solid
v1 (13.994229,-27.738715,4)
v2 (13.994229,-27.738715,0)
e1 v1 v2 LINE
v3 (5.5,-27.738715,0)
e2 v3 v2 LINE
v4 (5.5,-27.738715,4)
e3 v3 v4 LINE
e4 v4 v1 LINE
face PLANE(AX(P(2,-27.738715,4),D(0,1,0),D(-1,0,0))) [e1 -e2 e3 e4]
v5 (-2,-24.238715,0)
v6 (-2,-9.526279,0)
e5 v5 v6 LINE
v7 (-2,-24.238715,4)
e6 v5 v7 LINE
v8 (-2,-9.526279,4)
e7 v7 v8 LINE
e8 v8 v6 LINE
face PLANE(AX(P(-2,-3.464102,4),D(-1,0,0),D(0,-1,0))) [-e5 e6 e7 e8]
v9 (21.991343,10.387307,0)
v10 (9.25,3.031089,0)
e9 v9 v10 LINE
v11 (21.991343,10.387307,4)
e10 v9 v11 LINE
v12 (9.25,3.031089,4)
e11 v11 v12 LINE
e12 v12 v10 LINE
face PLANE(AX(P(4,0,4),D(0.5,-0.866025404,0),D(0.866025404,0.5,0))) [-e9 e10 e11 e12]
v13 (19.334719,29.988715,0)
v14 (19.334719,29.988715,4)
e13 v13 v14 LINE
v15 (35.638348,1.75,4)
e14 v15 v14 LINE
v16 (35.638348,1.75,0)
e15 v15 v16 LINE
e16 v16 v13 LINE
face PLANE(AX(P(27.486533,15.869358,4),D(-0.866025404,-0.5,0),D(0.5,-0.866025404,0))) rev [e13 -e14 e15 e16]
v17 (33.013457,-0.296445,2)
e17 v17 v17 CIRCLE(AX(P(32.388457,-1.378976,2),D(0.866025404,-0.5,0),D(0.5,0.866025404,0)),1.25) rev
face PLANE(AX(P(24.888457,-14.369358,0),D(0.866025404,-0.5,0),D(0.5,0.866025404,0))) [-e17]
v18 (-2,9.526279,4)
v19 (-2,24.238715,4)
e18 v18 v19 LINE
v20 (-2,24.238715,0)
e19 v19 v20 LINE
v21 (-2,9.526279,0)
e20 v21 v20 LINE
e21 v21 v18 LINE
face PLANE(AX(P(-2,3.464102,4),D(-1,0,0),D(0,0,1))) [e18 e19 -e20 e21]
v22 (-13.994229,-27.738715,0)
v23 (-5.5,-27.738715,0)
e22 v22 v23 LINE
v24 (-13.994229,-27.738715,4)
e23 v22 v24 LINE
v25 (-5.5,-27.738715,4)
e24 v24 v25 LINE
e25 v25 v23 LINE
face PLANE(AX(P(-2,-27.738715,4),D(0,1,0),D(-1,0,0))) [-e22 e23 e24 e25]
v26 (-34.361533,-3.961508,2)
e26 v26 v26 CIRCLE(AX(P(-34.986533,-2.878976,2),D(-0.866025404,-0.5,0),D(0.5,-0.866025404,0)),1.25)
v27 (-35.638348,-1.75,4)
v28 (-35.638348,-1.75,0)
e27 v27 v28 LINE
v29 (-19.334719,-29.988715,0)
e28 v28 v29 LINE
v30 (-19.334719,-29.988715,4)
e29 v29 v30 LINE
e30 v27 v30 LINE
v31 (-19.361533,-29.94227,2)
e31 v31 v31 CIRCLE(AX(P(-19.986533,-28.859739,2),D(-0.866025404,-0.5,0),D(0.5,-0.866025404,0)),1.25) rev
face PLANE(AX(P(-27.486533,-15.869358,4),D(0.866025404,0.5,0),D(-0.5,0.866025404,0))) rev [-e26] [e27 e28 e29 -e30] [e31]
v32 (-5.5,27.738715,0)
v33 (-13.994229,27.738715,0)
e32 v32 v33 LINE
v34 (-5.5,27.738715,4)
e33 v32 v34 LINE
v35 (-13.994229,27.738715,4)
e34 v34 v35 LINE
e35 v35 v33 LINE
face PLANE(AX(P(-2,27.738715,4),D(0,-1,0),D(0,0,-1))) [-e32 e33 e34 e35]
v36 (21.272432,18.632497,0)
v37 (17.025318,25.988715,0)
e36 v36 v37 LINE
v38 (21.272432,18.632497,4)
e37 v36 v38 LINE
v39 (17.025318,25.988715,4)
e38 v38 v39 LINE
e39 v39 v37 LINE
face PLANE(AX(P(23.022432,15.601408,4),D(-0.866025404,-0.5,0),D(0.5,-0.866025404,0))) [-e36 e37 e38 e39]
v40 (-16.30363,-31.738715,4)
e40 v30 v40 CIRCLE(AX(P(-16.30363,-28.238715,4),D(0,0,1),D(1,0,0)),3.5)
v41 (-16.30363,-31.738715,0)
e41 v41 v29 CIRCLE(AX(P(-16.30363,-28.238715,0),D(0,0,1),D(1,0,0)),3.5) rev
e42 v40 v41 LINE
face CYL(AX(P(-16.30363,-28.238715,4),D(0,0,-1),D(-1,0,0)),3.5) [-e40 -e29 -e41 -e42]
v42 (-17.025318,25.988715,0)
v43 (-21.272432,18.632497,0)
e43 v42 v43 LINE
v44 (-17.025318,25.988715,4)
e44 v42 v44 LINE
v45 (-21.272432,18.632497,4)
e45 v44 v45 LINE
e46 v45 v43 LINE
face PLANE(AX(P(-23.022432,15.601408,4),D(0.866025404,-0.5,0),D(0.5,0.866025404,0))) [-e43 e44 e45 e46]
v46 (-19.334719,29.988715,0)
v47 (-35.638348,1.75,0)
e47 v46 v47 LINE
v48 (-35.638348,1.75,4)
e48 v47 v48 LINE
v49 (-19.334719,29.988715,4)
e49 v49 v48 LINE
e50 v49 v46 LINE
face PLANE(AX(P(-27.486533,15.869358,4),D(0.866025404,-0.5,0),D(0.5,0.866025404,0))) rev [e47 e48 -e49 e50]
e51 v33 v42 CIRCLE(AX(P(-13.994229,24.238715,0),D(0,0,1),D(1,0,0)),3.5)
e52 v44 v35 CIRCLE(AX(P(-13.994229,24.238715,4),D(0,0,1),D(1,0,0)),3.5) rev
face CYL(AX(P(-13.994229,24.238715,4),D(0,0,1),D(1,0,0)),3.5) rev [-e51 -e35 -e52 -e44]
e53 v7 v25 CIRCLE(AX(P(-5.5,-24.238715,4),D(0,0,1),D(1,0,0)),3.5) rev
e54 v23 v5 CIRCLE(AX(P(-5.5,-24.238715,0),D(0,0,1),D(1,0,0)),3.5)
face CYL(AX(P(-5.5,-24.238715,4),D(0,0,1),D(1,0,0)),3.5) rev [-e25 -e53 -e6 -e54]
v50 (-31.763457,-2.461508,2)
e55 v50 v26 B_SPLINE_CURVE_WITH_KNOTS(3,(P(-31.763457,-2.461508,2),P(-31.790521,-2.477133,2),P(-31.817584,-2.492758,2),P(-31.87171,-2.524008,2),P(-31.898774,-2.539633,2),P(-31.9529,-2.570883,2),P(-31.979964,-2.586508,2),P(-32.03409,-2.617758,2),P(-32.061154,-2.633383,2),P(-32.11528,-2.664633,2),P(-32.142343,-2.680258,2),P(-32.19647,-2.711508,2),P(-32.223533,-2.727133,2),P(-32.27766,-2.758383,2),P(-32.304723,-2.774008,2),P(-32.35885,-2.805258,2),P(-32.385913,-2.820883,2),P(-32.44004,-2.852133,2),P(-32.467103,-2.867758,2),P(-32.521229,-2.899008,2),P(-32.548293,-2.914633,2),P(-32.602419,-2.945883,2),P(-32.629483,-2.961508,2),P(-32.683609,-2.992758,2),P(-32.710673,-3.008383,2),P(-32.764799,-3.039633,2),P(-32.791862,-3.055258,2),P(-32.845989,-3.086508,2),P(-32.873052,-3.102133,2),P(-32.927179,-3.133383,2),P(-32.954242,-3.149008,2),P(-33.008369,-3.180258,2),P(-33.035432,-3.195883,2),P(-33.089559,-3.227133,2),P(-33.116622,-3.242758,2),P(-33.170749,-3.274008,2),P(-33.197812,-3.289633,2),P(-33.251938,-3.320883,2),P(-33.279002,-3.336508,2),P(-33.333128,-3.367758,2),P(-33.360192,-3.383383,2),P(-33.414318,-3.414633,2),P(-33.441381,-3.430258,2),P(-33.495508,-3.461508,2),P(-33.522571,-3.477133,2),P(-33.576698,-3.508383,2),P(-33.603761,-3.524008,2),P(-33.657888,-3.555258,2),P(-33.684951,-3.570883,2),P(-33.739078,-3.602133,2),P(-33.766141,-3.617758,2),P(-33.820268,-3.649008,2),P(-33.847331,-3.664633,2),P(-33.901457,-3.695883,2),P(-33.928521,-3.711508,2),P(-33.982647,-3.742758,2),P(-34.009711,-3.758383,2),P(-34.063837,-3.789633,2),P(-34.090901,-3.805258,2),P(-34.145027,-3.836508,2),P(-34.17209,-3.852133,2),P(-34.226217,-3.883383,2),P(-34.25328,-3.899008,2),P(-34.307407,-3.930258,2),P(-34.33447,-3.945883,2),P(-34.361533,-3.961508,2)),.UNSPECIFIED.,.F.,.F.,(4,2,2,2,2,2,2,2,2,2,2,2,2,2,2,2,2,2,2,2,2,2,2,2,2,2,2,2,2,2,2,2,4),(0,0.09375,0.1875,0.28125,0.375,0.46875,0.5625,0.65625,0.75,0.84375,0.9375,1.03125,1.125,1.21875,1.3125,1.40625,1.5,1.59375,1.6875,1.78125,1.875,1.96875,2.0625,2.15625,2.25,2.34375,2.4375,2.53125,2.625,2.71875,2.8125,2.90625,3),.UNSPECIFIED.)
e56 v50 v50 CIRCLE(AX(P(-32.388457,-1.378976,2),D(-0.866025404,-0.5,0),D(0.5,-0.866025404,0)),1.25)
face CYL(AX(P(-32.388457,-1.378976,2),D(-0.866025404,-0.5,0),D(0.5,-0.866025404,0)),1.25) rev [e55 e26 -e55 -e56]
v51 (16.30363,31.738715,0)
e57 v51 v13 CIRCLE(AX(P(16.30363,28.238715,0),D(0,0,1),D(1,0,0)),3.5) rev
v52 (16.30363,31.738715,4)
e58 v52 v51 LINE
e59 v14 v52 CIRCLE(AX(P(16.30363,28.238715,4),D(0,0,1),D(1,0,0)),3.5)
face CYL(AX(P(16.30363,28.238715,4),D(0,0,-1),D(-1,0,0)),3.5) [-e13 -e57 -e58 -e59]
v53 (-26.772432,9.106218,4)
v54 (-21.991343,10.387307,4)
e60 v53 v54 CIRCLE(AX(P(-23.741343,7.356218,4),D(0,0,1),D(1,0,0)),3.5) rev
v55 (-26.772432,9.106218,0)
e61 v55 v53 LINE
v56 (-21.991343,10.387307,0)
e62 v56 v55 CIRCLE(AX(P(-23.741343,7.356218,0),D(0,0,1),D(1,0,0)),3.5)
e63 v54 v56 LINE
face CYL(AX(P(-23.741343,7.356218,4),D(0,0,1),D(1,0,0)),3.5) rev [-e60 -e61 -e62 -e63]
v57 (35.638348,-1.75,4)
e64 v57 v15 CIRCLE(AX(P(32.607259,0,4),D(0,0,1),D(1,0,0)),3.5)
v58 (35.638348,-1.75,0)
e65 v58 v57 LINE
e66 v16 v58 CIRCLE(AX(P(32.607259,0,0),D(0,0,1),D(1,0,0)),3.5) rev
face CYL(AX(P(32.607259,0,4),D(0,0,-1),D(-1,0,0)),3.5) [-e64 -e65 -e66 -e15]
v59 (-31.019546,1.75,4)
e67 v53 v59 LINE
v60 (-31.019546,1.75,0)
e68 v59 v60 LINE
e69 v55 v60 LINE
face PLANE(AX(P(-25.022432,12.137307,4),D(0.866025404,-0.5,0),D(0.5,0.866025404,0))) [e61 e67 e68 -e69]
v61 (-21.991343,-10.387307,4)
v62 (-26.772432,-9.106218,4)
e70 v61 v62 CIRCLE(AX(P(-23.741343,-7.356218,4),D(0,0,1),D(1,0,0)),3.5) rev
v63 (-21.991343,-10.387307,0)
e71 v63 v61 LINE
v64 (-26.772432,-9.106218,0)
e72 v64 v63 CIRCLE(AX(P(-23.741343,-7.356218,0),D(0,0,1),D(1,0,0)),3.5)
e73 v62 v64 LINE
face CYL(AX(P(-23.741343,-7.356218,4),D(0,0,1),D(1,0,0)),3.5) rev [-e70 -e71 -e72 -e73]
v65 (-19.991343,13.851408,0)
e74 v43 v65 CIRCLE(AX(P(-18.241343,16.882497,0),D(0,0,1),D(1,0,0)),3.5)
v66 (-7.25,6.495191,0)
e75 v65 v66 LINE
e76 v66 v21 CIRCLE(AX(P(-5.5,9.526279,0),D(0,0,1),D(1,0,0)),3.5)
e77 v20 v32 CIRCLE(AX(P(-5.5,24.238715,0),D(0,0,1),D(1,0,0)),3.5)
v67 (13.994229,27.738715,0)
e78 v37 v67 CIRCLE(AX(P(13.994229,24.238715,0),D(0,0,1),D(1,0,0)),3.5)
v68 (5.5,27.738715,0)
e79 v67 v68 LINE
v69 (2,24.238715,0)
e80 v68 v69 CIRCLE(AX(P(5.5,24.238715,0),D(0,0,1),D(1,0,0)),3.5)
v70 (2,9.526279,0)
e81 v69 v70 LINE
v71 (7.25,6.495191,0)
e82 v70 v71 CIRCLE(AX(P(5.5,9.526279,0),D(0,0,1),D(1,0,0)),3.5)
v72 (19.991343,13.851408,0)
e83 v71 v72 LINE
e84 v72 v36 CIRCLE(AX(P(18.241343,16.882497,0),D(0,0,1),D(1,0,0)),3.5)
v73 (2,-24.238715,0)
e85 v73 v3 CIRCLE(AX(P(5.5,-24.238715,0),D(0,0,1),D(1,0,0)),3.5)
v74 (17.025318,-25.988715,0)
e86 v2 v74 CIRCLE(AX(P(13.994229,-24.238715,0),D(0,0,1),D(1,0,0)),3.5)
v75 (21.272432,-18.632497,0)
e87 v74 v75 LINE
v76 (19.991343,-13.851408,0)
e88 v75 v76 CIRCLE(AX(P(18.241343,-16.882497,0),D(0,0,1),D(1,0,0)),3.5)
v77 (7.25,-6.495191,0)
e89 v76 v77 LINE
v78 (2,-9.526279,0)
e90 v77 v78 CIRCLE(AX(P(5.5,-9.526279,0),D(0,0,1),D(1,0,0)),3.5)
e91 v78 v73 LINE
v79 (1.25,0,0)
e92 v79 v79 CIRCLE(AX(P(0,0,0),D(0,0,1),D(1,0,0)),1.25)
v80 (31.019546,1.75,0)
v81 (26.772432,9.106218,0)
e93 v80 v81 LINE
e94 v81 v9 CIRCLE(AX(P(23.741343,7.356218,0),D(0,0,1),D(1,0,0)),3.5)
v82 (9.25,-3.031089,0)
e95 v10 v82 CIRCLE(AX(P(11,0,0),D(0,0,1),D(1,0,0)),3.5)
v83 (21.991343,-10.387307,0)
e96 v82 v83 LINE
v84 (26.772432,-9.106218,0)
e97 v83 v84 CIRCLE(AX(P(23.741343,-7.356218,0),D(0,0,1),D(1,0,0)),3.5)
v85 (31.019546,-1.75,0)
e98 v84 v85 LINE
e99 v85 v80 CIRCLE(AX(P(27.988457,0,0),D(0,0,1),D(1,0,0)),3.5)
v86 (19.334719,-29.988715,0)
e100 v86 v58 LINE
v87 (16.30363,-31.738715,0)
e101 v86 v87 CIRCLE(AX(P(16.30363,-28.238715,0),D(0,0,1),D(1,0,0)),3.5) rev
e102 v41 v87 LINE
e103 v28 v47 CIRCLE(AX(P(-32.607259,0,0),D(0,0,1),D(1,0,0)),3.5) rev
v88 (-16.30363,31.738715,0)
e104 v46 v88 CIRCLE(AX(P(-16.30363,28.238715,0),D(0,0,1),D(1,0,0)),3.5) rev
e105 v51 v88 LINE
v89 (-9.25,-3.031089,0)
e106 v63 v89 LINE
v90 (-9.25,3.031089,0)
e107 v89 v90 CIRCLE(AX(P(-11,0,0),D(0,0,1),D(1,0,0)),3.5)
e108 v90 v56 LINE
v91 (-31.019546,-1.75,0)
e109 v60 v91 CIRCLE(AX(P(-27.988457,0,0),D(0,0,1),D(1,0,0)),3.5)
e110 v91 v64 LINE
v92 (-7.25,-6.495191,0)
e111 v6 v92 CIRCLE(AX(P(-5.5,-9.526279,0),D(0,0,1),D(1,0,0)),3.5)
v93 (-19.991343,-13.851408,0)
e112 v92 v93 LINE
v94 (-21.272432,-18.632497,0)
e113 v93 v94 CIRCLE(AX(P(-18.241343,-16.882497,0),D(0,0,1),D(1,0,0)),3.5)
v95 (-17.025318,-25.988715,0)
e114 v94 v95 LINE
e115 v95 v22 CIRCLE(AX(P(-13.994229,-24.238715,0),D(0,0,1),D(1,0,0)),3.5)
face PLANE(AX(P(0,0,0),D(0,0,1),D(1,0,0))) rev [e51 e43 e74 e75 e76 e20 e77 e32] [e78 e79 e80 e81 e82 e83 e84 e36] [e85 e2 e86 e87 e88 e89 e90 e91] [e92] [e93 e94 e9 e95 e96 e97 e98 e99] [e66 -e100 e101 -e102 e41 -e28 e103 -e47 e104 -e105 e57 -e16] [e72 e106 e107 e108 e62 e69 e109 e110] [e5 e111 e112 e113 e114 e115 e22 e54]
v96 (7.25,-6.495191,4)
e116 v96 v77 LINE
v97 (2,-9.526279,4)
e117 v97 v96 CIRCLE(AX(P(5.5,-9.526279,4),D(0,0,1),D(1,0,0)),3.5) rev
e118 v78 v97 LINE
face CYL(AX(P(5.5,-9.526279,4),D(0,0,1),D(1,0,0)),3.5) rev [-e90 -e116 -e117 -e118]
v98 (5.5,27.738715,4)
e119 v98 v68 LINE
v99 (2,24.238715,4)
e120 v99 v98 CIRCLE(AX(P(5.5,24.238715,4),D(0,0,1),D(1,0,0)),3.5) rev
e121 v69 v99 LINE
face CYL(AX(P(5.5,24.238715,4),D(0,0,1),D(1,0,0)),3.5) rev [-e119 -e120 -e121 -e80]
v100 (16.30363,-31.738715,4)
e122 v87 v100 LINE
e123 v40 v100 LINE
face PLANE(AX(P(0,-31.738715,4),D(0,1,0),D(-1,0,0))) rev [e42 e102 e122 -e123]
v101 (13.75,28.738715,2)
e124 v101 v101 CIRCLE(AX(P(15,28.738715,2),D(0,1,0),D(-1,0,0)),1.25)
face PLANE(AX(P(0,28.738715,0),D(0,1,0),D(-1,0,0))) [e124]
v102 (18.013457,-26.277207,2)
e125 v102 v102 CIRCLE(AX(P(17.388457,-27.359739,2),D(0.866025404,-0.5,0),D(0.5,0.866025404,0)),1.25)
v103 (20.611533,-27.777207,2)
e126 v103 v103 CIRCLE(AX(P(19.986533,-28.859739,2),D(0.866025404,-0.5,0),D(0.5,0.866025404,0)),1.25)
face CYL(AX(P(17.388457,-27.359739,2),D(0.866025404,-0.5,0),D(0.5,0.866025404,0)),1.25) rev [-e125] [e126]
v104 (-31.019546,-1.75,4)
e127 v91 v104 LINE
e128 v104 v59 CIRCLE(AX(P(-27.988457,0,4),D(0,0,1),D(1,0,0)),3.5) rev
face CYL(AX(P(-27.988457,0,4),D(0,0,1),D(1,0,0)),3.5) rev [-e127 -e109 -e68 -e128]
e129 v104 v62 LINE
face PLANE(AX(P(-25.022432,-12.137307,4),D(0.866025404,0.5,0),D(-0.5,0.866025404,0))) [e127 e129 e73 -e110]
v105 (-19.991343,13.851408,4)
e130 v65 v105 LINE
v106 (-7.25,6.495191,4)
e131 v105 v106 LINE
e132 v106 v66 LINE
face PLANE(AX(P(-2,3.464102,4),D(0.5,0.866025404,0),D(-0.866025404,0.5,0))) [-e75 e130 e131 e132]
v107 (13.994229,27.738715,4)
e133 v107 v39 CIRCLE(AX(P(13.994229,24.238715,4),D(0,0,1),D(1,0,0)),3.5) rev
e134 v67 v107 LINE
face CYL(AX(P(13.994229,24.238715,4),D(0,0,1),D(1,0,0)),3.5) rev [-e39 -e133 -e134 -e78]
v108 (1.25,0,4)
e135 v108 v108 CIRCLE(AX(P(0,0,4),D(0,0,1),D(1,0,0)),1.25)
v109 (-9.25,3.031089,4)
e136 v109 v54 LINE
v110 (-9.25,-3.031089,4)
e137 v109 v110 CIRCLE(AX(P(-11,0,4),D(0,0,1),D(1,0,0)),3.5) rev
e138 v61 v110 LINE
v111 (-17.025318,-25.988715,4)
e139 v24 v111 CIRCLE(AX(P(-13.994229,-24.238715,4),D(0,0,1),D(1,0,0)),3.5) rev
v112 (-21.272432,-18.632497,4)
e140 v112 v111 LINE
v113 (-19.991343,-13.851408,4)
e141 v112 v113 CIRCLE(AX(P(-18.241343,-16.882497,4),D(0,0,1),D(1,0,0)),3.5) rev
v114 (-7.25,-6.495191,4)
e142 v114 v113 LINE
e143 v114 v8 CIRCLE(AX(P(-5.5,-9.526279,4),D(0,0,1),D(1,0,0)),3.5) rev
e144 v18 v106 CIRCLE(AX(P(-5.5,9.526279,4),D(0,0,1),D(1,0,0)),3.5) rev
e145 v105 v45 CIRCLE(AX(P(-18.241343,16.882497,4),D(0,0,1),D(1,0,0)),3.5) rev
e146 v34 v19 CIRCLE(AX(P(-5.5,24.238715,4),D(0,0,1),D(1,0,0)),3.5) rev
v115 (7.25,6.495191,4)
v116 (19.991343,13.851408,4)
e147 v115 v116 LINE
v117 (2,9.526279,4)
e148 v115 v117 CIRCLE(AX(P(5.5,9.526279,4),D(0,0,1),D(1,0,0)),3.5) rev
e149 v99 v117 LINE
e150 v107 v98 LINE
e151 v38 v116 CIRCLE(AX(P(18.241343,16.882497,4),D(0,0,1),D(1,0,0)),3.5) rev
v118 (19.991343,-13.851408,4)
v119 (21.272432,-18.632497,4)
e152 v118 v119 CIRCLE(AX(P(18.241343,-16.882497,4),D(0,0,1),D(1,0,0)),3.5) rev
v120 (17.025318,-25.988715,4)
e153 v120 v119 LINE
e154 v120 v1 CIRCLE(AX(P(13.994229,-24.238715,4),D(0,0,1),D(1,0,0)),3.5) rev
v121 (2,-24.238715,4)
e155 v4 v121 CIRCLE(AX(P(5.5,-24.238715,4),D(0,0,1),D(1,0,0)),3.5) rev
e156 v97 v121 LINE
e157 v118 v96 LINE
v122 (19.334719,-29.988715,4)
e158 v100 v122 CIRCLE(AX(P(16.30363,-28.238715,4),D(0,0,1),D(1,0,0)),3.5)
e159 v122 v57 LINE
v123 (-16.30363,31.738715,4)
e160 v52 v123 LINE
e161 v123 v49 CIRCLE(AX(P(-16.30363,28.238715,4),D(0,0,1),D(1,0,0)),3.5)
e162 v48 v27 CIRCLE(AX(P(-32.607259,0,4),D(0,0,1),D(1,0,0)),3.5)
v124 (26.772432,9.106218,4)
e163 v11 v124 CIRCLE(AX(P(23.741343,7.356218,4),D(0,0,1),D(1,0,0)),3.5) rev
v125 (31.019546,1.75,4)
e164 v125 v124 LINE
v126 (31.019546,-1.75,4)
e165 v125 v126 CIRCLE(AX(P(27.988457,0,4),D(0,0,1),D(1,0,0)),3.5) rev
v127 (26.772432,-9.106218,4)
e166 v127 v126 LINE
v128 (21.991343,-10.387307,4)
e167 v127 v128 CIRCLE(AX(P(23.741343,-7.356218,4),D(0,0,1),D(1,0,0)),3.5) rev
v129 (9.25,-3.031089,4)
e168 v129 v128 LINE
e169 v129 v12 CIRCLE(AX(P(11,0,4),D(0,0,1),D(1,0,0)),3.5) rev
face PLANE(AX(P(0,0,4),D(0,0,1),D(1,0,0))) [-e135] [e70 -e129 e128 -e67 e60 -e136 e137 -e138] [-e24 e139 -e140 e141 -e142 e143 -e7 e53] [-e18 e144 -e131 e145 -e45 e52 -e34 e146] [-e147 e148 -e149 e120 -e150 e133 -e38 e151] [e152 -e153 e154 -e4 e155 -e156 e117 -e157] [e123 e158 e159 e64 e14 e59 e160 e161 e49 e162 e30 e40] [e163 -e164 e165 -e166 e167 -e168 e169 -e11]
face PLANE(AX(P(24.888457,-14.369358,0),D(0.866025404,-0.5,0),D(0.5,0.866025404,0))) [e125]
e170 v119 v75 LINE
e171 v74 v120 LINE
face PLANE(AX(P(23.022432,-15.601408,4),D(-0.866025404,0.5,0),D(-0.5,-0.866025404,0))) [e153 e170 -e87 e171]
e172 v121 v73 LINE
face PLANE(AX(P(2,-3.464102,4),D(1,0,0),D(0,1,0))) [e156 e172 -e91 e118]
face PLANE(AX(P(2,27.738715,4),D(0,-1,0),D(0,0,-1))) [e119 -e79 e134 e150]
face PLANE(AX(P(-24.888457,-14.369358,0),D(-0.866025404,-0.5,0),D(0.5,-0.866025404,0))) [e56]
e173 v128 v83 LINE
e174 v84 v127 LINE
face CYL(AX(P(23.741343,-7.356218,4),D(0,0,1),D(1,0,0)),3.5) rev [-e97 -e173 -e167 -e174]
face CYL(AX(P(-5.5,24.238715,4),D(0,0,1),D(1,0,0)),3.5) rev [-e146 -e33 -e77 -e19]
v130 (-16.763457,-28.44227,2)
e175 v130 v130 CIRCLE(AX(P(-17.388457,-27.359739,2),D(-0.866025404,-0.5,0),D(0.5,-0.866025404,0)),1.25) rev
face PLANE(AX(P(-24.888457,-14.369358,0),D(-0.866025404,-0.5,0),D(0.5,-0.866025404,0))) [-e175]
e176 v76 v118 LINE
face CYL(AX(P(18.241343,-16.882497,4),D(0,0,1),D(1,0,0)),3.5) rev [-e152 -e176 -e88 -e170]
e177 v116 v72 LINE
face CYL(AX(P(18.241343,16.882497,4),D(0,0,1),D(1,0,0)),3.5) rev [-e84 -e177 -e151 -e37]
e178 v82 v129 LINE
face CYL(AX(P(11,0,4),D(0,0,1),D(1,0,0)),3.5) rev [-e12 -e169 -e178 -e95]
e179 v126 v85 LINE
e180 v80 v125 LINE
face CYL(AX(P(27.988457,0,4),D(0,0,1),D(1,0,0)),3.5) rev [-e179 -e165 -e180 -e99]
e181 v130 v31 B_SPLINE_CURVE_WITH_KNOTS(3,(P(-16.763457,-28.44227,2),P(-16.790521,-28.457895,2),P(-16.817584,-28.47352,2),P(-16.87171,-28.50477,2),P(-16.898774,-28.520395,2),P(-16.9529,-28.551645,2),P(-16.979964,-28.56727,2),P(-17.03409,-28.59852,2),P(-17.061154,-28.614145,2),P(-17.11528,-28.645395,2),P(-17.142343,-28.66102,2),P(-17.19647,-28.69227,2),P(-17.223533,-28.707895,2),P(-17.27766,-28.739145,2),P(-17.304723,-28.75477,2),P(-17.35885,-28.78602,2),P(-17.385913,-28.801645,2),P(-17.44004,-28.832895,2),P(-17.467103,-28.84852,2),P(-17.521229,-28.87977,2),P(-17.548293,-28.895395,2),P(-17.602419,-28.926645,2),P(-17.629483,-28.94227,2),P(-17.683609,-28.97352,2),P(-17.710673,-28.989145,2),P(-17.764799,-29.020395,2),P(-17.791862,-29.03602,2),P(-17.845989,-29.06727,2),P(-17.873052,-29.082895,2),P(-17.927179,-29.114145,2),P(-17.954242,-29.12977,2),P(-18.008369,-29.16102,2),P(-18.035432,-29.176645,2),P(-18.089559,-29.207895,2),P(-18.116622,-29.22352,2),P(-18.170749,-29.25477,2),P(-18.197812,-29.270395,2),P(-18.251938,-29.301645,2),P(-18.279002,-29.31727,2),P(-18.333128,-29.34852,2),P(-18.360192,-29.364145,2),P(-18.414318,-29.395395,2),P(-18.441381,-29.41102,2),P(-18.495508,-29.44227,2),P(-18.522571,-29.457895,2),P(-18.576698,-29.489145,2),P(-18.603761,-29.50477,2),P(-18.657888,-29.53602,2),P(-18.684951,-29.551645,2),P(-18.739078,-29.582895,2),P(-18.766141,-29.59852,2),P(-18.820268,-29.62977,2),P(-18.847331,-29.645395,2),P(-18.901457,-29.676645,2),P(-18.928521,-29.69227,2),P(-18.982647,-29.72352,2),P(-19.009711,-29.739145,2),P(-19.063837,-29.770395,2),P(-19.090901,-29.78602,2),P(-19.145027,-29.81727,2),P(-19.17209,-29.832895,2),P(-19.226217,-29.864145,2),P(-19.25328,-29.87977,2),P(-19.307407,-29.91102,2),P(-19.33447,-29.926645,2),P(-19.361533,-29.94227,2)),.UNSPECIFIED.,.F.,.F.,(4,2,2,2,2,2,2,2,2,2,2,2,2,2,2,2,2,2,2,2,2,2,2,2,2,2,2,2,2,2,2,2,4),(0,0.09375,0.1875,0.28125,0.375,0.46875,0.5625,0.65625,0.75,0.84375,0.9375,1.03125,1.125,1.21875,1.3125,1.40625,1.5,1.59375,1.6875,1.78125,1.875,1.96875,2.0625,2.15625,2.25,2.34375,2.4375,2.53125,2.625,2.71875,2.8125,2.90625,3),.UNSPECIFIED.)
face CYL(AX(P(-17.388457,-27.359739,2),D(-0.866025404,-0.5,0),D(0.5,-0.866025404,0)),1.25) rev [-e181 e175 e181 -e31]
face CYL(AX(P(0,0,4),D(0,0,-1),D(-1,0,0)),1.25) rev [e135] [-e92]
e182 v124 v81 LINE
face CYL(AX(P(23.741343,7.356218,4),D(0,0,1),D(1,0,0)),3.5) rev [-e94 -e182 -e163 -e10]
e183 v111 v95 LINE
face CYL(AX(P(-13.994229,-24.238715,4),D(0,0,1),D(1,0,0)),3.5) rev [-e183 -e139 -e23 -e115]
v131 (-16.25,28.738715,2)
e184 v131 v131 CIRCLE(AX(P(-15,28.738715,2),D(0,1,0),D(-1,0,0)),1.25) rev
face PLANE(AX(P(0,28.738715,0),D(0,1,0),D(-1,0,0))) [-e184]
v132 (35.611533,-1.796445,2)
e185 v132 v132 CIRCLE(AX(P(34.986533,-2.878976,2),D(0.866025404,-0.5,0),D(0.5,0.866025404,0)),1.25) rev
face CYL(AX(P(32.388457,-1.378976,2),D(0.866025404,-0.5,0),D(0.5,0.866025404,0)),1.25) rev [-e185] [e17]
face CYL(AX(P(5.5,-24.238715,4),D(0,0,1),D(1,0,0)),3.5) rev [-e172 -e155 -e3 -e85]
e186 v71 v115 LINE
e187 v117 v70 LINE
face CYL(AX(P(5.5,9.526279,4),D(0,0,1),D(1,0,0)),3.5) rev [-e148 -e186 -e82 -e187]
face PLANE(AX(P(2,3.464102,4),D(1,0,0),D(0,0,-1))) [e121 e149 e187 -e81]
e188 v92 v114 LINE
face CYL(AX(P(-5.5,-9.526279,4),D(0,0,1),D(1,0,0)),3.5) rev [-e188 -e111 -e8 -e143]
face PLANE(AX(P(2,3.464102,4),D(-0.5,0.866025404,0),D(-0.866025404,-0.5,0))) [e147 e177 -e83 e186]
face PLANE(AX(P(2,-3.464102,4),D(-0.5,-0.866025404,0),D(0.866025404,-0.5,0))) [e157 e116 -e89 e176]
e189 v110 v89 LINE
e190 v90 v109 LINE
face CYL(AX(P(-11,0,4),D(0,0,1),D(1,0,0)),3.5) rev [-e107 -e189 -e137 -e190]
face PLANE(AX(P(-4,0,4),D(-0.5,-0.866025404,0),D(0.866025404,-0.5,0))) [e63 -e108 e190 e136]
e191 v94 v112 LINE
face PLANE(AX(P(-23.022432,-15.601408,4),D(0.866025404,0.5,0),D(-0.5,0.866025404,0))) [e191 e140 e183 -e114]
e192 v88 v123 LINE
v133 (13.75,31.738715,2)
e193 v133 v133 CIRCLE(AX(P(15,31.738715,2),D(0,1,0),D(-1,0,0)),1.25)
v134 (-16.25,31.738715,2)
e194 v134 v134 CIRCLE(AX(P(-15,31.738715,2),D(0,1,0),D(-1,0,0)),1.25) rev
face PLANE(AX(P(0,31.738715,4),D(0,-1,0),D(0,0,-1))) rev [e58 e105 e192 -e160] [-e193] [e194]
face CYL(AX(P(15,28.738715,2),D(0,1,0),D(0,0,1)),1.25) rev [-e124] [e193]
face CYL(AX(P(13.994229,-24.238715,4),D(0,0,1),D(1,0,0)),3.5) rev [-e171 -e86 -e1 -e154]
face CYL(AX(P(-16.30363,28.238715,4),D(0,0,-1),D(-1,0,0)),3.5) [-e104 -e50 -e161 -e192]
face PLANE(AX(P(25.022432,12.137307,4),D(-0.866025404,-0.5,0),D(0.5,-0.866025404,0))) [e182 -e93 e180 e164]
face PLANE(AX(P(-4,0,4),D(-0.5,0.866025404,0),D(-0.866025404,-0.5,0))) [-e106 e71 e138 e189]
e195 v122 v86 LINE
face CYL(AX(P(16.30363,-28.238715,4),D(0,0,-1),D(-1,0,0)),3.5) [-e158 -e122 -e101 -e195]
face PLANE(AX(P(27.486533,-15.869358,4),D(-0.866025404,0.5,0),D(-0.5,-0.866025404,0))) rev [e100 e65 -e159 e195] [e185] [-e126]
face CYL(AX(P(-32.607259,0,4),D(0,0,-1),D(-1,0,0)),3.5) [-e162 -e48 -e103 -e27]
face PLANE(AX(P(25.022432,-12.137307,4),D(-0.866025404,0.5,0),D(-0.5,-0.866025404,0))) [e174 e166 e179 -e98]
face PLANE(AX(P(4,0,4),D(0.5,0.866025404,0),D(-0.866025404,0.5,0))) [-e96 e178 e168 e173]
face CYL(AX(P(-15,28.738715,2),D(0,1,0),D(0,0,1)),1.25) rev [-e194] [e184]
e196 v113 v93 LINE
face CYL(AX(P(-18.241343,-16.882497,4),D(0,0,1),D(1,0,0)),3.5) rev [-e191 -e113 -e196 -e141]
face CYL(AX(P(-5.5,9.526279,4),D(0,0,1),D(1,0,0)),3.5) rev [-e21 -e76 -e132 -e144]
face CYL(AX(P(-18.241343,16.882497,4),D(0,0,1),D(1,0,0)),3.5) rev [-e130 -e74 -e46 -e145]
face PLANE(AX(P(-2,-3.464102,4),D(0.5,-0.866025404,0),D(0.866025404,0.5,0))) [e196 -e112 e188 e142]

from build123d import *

# Parameters (mm, degrees)
SKETCH1_R              = 1.25
BOSS_EXTRUDE4_DEPTH    = 4
FILLET1_R              = 3.5
CUT_EXTRUDE1_START     = -31.73871501
CUT_EXTRUDE1_OUTLINE_R = 1.25
CUT_EXTRUDE1_DEPTH     = 3
CIRPATTERN1_COUNT      = 3


# Read off the part's stored shape, not the designer's step: Cut-Extrude1
with BuildPart() as part:
    # Sketch1 (on Front Plane) → Boss-Extrude4 (new body)
    with BuildSketch(Plane.XY):
        Polygon((0, 31.73871501), (-18.324355655, 31.73871501), (-27.486533482, 15.869357505), (-36.64871131, 0), (-27.486533482, -15.869357505), (-18.324355655, -31.73871501), (0, -31.73871501), (18.324355655, -31.73871501), (27.486533482, -15.869357505), (36.64871131, 0), (27.486533482, 15.869357505), (18.324355655, 31.73871501), align=None)
        Circle(SKETCH1_R, mode=Mode.SUBTRACT)
        Polygon((-2, 3.464101615), (-2, 27.73871501), (-16.014954578, 27.73871501), (-23.022431867, 15.601408313), align=None, mode=Mode.SUBTRACT)
        Polygon((-4, 0), (-25.022431867, -12.137306697), (-32.029909156, 0), (-25.022431867, 12.137306697), align=None, mode=Mode.SUBTRACT)
        Polygon((2, 27.73871501), (16.014954578, 27.73871501), (23.022431867, 15.601408313), (2, 3.464101615), align=None, mode=Mode.SUBTRACT)
        Polygon((25.022431867, 12.137306697), (32.029909156, 0), (25.022431867, -12.137306697), (4, 0), align=None, mode=Mode.SUBTRACT)
        Polygon((23.022431867, -15.601408313), (16.014954578, -27.73871501), (2, -27.73871501), (2, -3.464101615), align=None, mode=Mode.SUBTRACT)
        Polygon((-2, -3.464101615), (-2, -27.73871501), (-16.014954578, -27.73871501), (-23.022431867, -15.601408313), align=None, mode=Mode.SUBTRACT)
    extrude(amount=BOSS_EXTRUDE4_DEPTH)

    # Fillet1
    fillet1_edges = [part.edges().sort_by_distance(p)[0] for p in [
        (2, -27.73871501, 2),
        (16.014954578, -27.73871501, 2),
        (23.022431867, -15.601408313, 2),
        (2, -3.464101615, 2),
        (18.324355655, 31.73871501, 2),
        (36.64871131, 0, 2),
        (18.324355655, -31.73871501, 2),
        (-18.324355655, -31.73871501, 2),
        (-36.64871131, 0, 2),
        (-18.324355655, 31.73871501, 2),
        (23.022431867, 15.601408313, 2),
        (16.014954578, 27.73871501, 2),
        (2, 27.73871501, 2),
        (2, 3.464101615, 2),
        (-16.014954578, 27.73871501, 2),
        (-23.022431867, 15.601408313, 2),
        (-2, 3.464101615, 2),
        (-2, 27.73871501, 2),
        (-25.022431867, 12.137306697, 2),
        (-32.029909156, 0, 2),
        (-25.022431867, -12.137306697, 2),
        (-4, 0, 2),
        (25.022431867, -12.137306697, 2),
        (32.029909156, 0, 2),
        (25.022431867, 12.137306697, 2),
        (4, 0, 2),
        (-2, -3.464101615, 2),
        (-23.022431867, -15.601408313, 2),
        (-16.014954578, -27.73871501, 2),
        (-2, -27.73871501, 2),
    ]]
    fillet(fillet1_edges, radius=FILLET1_R)

    # Cut-Extrude1 outline → Cut-Extrude1 (cut)
    with BuildSketch(Plane(origin=(0, 0, 0), x_dir=(0.49999999999999195, -0.8660254037844434, 0), z_dir=(0.8660254037844433, 0.4999999999999921, 0)).offset(CUT_EXTRUDE1_START)):
        with Locations((15, -2)):
            Circle(CUT_EXTRUDE1_OUTLINE_R)
        with Locations((-15, -2)):
            Circle(CUT_EXTRUDE1_OUTLINE_R)
    cut_extrude1 = extrude(amount=CUT_EXTRUDE1_DEPTH, mode=Mode.SUBTRACT)

    # CirPattern1: Cut-Extrude1 ×3 about axis
    cirpattern1_axis = Axis((0, 0, 0), (0, 0, -1))
    for i in range(1, CIRPATTERN1_COUNT):
        add(cut_extrude1.rotate(cirpattern1_axis, i * 360 / CIRPATTERN1_COUNT), mode=Mode.SUBTRACT)


solid = part.part
